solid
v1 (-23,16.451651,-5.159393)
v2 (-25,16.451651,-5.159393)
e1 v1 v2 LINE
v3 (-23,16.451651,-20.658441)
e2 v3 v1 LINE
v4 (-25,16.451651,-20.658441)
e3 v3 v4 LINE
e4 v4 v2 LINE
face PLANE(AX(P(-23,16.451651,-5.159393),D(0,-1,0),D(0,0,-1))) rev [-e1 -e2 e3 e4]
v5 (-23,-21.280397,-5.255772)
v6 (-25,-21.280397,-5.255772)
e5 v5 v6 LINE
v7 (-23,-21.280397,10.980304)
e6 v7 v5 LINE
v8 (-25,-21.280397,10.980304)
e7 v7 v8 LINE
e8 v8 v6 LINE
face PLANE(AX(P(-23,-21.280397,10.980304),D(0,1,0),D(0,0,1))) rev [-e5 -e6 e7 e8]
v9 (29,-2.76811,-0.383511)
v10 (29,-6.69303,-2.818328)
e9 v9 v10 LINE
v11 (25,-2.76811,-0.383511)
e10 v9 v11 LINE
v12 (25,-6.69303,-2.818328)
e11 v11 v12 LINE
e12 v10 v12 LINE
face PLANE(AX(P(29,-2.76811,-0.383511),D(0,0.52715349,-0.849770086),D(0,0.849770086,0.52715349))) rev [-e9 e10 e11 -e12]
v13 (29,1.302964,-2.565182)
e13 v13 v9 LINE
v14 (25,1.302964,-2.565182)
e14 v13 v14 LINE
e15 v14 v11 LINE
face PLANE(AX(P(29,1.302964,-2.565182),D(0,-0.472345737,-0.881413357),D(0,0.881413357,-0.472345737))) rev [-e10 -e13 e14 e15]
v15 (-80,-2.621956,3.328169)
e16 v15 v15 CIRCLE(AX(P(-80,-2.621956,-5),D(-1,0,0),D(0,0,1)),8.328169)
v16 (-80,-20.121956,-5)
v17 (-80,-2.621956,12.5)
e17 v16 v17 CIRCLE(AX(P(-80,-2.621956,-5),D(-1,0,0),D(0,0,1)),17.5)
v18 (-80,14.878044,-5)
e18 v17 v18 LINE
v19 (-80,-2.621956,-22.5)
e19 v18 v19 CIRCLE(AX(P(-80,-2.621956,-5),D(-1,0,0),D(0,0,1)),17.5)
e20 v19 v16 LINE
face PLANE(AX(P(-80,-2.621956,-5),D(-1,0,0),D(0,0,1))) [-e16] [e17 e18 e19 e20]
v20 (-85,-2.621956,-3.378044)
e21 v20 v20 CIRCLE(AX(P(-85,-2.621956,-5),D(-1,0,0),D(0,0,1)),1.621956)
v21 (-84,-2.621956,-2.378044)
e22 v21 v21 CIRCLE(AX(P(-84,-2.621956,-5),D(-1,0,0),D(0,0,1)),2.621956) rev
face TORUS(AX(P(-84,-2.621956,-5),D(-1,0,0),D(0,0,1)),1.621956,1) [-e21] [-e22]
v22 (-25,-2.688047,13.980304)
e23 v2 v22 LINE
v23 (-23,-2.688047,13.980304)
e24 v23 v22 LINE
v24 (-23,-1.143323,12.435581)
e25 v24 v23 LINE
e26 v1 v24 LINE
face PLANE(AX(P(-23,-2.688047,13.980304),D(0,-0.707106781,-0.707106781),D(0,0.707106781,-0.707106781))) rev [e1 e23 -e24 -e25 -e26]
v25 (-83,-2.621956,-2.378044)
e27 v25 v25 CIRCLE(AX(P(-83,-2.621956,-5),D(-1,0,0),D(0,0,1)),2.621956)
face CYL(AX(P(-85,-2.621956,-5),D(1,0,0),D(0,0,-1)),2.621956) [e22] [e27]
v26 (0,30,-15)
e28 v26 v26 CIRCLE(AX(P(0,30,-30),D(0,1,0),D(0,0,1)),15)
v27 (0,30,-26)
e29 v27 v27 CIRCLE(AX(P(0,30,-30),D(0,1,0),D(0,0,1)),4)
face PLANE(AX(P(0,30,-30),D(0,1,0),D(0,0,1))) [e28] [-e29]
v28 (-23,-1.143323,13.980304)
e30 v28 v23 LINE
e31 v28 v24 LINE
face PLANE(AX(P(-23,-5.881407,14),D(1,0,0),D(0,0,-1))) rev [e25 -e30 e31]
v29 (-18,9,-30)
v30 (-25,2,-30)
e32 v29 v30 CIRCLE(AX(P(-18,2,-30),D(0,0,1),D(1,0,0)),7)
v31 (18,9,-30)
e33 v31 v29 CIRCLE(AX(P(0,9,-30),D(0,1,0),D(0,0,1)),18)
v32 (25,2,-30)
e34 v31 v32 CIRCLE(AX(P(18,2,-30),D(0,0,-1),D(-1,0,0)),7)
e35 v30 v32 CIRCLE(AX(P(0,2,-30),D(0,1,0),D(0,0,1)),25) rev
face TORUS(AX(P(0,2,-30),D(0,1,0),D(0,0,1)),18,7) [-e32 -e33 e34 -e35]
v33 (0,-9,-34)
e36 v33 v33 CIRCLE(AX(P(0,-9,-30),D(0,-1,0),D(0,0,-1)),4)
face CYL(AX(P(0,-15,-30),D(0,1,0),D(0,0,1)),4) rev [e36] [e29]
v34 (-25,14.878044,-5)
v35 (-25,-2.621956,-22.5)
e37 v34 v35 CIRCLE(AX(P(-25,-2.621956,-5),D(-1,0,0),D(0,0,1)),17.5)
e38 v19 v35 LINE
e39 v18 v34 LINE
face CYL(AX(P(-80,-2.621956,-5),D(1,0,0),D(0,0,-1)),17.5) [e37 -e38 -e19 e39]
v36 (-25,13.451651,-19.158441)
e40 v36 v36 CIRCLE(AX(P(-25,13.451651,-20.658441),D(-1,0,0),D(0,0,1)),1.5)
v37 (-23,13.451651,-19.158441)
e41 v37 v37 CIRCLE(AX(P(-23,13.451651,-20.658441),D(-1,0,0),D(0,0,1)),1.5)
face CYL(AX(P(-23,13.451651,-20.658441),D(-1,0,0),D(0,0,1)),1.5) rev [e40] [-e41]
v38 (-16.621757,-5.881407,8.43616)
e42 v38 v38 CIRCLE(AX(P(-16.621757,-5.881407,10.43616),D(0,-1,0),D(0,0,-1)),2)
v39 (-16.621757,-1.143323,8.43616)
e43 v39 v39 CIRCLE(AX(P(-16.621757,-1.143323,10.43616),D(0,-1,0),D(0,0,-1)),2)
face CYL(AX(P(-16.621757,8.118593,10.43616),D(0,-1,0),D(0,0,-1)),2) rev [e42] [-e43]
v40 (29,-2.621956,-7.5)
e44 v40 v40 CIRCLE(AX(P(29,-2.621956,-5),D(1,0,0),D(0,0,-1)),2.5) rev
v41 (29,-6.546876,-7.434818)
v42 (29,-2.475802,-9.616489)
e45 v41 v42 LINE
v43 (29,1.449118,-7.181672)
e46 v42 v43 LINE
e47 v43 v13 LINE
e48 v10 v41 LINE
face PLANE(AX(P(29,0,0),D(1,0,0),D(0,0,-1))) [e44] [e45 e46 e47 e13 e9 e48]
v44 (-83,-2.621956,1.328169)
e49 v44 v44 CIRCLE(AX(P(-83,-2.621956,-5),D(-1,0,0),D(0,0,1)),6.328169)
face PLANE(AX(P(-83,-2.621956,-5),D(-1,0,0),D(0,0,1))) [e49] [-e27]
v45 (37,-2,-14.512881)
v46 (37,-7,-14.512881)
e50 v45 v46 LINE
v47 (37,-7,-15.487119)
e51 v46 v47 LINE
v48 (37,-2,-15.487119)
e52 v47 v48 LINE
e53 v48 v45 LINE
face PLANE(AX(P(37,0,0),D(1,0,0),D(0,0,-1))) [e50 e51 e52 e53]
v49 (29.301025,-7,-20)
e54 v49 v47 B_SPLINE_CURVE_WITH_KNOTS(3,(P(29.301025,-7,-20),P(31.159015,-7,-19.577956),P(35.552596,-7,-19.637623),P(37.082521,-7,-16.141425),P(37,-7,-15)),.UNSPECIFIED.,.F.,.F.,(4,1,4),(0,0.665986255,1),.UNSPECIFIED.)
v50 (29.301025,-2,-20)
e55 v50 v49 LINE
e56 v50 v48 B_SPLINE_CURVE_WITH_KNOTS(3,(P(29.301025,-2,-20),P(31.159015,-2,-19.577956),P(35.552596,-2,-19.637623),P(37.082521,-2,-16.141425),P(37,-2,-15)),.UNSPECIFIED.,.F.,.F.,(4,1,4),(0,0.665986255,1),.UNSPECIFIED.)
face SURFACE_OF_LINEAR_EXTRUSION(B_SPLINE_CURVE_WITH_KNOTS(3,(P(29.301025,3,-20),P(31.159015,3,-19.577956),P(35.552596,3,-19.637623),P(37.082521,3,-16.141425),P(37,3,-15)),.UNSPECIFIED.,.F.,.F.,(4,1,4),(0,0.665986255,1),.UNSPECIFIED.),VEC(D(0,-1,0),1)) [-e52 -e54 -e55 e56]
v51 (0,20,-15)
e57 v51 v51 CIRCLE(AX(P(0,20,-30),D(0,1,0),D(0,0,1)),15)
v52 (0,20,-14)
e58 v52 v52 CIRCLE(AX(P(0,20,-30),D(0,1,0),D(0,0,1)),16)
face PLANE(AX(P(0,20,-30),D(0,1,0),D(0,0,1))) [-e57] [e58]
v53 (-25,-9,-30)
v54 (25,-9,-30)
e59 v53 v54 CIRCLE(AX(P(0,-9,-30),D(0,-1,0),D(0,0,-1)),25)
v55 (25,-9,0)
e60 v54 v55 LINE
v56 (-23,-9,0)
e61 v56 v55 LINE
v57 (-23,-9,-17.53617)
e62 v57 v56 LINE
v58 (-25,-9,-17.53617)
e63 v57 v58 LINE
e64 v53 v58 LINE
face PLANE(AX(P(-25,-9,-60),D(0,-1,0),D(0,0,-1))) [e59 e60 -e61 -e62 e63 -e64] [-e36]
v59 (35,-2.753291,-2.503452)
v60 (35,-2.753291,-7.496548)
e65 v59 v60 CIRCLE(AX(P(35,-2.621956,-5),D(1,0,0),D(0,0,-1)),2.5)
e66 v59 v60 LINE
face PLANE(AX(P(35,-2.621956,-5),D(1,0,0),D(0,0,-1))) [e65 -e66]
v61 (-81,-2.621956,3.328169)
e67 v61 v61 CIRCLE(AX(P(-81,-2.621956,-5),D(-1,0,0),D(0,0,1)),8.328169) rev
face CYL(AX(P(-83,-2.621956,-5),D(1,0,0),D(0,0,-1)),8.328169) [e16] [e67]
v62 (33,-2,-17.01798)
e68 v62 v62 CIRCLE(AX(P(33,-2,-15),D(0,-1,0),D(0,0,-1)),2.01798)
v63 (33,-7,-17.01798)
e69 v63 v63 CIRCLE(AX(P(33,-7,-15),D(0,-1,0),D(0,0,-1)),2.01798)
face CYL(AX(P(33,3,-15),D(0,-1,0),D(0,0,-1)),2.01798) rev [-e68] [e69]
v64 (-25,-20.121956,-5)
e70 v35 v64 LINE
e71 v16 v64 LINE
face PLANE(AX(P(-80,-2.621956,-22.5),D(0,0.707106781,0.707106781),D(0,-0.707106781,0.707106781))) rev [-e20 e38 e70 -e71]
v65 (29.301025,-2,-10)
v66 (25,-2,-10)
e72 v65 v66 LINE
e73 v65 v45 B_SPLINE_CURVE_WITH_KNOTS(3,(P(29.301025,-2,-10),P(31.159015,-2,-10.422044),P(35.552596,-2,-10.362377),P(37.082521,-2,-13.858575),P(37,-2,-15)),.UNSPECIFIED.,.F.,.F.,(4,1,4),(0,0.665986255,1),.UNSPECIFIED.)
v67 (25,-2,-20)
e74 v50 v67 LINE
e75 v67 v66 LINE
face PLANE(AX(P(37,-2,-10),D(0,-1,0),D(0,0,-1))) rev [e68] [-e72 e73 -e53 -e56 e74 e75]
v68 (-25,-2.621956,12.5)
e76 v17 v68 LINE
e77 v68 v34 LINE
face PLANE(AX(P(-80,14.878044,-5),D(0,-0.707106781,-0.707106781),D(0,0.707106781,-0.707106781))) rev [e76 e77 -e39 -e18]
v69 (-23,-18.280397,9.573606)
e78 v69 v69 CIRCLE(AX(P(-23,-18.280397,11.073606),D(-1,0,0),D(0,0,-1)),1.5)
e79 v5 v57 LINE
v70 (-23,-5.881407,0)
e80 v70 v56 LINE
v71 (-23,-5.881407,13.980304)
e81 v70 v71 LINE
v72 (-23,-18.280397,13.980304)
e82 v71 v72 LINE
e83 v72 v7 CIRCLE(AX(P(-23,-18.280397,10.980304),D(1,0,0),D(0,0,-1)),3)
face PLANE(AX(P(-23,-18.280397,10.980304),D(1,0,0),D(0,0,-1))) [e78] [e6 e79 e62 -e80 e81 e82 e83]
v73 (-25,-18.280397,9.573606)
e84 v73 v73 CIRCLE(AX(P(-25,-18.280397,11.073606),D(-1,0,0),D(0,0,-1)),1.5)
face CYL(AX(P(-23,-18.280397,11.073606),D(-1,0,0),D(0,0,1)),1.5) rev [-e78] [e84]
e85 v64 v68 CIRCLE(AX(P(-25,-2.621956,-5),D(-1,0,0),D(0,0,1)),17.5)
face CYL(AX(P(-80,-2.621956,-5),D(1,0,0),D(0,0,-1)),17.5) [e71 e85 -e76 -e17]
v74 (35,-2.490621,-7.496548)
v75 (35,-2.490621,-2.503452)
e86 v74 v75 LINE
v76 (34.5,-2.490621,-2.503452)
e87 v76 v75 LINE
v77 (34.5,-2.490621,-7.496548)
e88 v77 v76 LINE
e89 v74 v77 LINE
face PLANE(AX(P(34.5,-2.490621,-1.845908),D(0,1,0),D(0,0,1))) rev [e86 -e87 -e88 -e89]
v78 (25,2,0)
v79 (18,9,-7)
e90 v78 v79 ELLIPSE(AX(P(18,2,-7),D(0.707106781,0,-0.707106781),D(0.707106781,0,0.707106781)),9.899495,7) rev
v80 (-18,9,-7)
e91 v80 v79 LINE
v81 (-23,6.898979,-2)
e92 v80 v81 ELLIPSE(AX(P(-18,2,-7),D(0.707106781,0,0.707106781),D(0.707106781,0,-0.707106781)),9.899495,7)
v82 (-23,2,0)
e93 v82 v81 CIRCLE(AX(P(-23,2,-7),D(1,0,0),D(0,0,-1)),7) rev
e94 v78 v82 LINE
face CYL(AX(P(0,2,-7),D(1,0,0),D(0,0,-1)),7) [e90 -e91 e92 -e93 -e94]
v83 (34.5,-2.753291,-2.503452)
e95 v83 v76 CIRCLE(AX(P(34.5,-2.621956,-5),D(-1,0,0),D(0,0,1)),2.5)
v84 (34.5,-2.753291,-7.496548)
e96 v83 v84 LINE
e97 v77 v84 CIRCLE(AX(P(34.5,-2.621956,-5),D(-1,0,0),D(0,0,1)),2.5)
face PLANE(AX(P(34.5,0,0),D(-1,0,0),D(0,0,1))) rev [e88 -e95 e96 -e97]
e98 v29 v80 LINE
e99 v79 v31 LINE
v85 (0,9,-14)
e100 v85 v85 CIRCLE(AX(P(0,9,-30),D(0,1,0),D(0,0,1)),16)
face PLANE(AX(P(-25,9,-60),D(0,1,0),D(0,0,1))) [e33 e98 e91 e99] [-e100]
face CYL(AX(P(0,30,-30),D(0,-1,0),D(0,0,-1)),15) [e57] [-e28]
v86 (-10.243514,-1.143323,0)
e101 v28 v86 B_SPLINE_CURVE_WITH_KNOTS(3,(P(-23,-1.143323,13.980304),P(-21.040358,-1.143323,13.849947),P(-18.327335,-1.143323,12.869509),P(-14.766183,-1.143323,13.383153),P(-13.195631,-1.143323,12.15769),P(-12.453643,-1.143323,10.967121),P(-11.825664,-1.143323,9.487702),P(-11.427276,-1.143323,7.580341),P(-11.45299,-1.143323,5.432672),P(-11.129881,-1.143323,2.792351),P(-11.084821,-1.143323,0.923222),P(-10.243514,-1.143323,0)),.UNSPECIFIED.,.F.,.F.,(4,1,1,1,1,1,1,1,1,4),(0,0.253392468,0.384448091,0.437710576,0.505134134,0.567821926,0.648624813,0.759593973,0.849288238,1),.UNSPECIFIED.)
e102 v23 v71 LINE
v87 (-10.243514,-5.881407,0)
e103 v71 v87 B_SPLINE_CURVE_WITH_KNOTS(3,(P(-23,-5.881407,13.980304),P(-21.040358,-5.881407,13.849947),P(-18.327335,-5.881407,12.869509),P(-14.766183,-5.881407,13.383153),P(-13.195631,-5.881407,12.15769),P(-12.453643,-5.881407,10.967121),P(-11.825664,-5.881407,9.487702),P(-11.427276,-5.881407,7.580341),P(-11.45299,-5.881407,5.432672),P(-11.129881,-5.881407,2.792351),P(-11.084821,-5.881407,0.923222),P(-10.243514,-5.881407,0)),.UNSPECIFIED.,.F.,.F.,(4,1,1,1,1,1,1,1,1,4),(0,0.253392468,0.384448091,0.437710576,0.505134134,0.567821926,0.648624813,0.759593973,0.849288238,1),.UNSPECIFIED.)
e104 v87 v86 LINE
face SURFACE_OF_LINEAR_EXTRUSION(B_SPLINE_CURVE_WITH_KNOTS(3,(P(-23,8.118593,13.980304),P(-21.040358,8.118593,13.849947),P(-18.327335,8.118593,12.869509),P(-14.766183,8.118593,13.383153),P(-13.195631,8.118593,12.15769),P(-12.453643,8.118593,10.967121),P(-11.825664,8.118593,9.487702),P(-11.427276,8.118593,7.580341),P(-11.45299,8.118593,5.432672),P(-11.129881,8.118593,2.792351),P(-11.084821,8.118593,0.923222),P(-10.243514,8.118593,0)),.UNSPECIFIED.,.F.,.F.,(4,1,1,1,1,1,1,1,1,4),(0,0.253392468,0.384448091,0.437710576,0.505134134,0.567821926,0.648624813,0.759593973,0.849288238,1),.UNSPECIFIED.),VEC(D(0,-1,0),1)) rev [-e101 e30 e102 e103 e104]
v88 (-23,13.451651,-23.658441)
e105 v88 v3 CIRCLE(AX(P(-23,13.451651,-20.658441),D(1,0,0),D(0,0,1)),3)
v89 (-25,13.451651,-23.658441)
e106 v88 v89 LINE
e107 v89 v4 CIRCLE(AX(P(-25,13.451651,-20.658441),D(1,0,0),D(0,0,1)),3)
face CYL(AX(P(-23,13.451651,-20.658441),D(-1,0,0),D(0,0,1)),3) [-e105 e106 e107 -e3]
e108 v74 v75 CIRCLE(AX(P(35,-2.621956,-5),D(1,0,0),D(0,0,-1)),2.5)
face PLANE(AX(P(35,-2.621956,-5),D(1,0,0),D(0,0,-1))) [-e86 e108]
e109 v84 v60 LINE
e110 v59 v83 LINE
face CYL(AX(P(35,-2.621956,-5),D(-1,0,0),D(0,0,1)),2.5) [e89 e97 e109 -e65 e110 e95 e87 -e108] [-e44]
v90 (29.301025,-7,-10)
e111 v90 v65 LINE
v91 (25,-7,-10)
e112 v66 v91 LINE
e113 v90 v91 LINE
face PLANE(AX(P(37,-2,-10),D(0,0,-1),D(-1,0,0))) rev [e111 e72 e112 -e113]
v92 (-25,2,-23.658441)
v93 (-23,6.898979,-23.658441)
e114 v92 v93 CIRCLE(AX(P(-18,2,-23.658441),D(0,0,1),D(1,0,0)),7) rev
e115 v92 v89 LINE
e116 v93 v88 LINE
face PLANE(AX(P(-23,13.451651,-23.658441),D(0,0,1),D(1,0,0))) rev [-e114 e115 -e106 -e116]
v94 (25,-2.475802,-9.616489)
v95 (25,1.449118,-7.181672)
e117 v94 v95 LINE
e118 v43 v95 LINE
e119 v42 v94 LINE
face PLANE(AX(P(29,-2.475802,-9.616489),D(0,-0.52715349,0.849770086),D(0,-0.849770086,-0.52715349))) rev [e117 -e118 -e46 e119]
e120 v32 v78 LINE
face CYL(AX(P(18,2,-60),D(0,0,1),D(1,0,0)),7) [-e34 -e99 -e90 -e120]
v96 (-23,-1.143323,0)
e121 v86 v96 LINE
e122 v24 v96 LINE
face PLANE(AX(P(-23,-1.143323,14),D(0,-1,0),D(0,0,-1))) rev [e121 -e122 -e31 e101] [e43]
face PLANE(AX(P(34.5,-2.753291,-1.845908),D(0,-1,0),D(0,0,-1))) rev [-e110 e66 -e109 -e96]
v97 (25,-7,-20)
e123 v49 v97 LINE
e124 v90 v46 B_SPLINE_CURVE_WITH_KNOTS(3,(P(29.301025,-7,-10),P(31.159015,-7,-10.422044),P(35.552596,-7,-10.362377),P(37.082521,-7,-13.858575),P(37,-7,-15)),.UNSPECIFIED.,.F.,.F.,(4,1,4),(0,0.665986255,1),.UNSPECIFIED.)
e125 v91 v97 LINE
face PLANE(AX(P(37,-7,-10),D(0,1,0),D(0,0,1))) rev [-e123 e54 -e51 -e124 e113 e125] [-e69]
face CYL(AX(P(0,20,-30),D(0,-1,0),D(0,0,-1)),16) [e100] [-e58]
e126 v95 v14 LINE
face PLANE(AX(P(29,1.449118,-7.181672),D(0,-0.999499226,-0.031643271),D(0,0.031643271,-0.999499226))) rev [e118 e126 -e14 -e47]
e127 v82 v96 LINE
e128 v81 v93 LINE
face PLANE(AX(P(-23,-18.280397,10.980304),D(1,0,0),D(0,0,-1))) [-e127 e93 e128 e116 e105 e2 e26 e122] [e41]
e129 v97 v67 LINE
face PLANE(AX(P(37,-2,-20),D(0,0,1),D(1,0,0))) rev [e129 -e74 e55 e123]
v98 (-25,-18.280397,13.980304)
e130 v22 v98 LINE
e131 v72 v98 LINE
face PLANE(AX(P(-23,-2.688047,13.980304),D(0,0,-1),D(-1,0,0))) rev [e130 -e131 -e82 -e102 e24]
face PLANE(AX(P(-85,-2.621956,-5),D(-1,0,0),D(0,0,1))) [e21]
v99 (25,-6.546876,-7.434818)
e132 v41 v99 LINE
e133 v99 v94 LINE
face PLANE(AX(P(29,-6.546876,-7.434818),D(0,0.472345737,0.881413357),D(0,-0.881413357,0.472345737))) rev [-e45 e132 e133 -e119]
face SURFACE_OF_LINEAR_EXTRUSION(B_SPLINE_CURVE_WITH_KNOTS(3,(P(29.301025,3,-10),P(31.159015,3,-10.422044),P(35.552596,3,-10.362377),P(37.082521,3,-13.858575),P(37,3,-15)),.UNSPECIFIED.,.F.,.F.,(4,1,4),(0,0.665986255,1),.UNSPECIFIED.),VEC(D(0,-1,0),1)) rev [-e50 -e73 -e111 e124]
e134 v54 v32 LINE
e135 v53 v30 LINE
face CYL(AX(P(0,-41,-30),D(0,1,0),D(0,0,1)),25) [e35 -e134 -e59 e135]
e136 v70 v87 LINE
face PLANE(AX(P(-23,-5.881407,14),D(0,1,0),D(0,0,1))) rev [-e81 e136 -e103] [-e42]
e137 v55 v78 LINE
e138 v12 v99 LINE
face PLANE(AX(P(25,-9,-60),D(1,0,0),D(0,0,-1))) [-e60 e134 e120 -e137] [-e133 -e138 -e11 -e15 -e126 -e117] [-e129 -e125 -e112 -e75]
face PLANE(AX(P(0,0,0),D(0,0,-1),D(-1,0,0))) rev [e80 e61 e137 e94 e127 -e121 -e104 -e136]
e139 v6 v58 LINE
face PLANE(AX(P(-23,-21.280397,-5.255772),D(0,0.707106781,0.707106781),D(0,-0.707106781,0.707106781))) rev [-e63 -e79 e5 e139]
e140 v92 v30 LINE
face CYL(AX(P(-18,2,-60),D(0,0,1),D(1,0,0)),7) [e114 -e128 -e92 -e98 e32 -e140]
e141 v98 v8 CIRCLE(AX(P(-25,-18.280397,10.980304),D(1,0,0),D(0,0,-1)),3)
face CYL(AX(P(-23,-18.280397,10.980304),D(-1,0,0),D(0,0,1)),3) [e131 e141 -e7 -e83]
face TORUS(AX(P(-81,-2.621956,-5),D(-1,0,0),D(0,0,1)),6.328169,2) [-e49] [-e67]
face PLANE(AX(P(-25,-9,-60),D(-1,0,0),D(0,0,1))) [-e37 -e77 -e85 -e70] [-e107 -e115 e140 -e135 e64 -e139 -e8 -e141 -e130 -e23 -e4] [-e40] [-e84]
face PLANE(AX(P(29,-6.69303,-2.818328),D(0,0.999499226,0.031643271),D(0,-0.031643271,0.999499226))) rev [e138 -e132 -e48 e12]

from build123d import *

# Parameters (mm, degrees)
SKETCH2_W                = 50
SKETCH2_H                = 18
BOSS_EXTRUDE1_DEPTH      = 60
CUT_EXTRUDE1_DEPTH       = 50
SKETCH4_R                = 16
BOSS_EXTRUDE2_DEPTH      = 11
SKETCH5_R                = 15
BOSS_EXTRUDE3_DEPTH      = 10
SKETCH6_R                = 4
CUT_EXTRUDE2_DEPTH       = 45
FILLET1_R                = 7
FILLET6_R                = 7
SKETCH7_W                = 10
SKETCH7_H                = 5
BOSS_EXTRUDE4_DEPTH      = 12
SKETCH8_R                = 2.017979808
CUT_EXTRUDE3_DEPTH       = 10
CUT_EXTRUDE4_DEPTH       = 10
BOSS_EXTRUDE5_DEPTH      = 4
BOSS_EXTRUDE6_DEPTH      = 6
BOSS_EXTRUDE6_DEPTH_BACK = 73
SKETCH12_R               = 2.5
SKETCH15_W               = 6.308184524
SKETCH15_H               = 0.262670096
CUT_EXTRUDE6_DEPTH       = 0.5
BOSS_EXTRUDE7_DEPTH      = 55
SKETCH22_R               = 8.328168783
BOSS_EXTRUDE8_DEPTH      = 3
SKETCH23_R               = 2.62195597
BOSS_EXTRUDE9_DEPTH      = 2
FILLET7_R                = 2
FILLET8_R                = 1
BOSS_EXTRUDE10_DEPTH     = 2
SKETCH25_R               = 1.5
CUT_EXTRUDE7_DEPTH       = 2
SKETCH27_W               = 12.756486499
SKETCH27_H               = 4.738083454
BOSS_EXTRUDE11_DEPTH     = 14
SKETCH28_R               = 2
CUT_EXTRUDE8_DEPTH       = 14


with BuildPart() as part:
    # Sketch2 → Boss-Extrude1 (new body)
    with BuildSketch(Plane.XY):
        Rectangle(SKETCH2_W, SKETCH2_H)
    extrude(amount=-BOSS_EXTRUDE1_DEPTH)

    # Sketch3 → Cut-Extrude1 (cut)
    with BuildSketch(Plane(origin=(0, 9, 0), x_dir=(1, 0, 0), z_dir=(0, 1, 0))):
        with BuildLine():
            Line((0, 55), (0, 60))
            Line((0, 60), (-25, 60))
            Line((-25, 60), (-25, 30))
            ThreePointArc((-25, 30), (-17.67766953, 47.67766953), (0, 55))
        make_face()
        with BuildLine():
            Line((25, 60), (0, 60))
            Line((0, 60), (0, 55))
            ThreePointArc((0, 55), (17.67766953, 47.67766953), (25, 30))
            Line((25, 30), (25, 60))
        make_face()
    extrude(amount=-CUT_EXTRUDE1_DEPTH, mode=Mode.SUBTRACT)

    # Sketch4 → Boss-Extrude2 (add)
    with BuildSketch(Plane(origin=(0, 9, 0), x_dir=(1, 0, 0), z_dir=(0, 1, 0))):
        with Locations(Location((0, 30, 0), (0, 0, 270))):
            Circle(SKETCH4_R)
    extrude(amount=BOSS_EXTRUDE2_DEPTH)

    # Sketch5 → Boss-Extrude3 (add)
    with BuildSketch(Plane(origin=(0, 20, 0), x_dir=(1, 0, 0), z_dir=(0, 1, 0))):
        with Locations(Location((0, 30, 0), (0, 0, 270))):
            Circle(SKETCH5_R)
    extrude(amount=BOSS_EXTRUDE3_DEPTH)

    # Sketch6 → Cut-Extrude2 (cut)
    with BuildSketch(Plane(origin=(0, 30, 0), x_dir=(1, 0, 0), z_dir=(0, 1, 0))):
        with Locations(Location((0, 30, 0), (0, 0, 270))):
            Circle(SKETCH6_R)
    extrude(amount=-CUT_EXTRUDE2_DEPTH, mode=Mode.SUBTRACT)

    # Fillet1
    fillet1_edges = [part.edges().sort_by_distance(p)[0] for p in [
        (0, 9, 0),
    ]]
    fillet(fillet1_edges, radius=FILLET1_R)

    # Fillet6
    # the kernel refuses this fillet: 7 mm, written as the material it takes off along each edge
    with BuildSketch(Plane(origin=(-25, 9, 10.5), x_dir=(0, -1, 0), z_dir=(0, 0, -1))) as fillet6_piece_1:
        with BuildLine():
            CenterArc((FILLET6_R, -FILLET6_R), FILLET6_R, 90, 90)
            Line((0, -FILLET6_R), (0, 0))
            Line((0, 0), (FILLET6_R, 0))
        make_face()
    extrude(amount=40.5, mode=Mode.SUBTRACT)
    with BuildSketch(Plane(origin=(0, 9, -30), x_dir=(-1, 0, 0), z_dir=(0, 0, 1))) as fillet6_piece_2:
        with BuildLine():
            CenterArc((25 - FILLET6_R, FILLET6_R), FILLET6_R, 270, 90)
            Line((25, FILLET6_R), (25, 0))
            Line((25, 0), (25 - FILLET6_R, 0))
        make_face()
    revolve(axis=Axis((0, 9, -30), (0, -1, 0)), revolution_arc=180, mode=Mode.SUBTRACT)
    with BuildSketch(Plane(origin=(25, 9, 10.5), x_dir=(0, -1, 0), z_dir=(0, 0, -1))) as fillet6_piece_3:
        with BuildLine():
            CenterArc((FILLET6_R, FILLET6_R), FILLET6_R, 180, 90)
            Line((0, FILLET6_R), (0, 0))
            Line((0, 0), (FILLET6_R, 0))
        make_face()
    extrude(amount=40.5, mode=Mode.SUBTRACT)

    # Sketch7 → Boss-Extrude4 (add)
    with BuildSketch(Plane(origin=(25, 0, 0), x_dir=(0, 0, -1), z_dir=(1, 0, 0))):
        with Locations((15, -4.5)):
            Rectangle(SKETCH7_W, SKETCH7_H)
    extrude(amount=BOSS_EXTRUDE4_DEPTH)

    # Sketch8 → Cut-Extrude3 (cut)
    with BuildSketch(Plane(origin=(0, -7, 0), x_dir=(-1, 0, 0), z_dir=(0, -1, 0))):
        with Locations(Location((-33, 15, 0), (0, 0, 90))):
            Circle(SKETCH8_R)
    extrude(amount=-CUT_EXTRUDE3_DEPTH, mode=Mode.SUBTRACT)

    # Sketch9 → Cut-Extrude4 (cut)
    with BuildSketch(Plane.XZ.offset(7)):
        with BuildLine():
            Line((37, -20), (37, -15.487118702))
            add(Edge.make_bspline(
                [(29.301025402, -20), (31.159014878, -19.577955894), (35.343998587, -19.634790074), (36.930791765, -16.465392679), (37, -15.487118702)],
                knots=[0, 0, 0, 0, 0.665986255, 0.952522337, 0.952522337, 0.952522337, 0.952522337], degree=3))
            Line((29.301025402, -20), (37, -20))
        make_face()
        with BuildLine():
            Line((37, -10), (29.301025402, -10))
            add(Edge.make_bspline(
                [(29.301025402, -10), (31.159014878, -10.422044106), (35.343998587, -10.365209926), (36.930791765, -13.534607321), (37, -14.512881298)],
                knots=[0, 0, 0, 0, 0.665986255, 0.952522337, 0.952522337, 0.952522337, 0.952522337], degree=3))
            Line((37, -14.512881298), (37, -10))
        make_face()
    extrude(amount=-CUT_EXTRUDE4_DEPTH, mode=Mode.SUBTRACT)

    # Sketch10 → Boss-Extrude5 (add)
    with BuildSketch(Plane(origin=(25, 0, 0), x_dir=(0, 0, -1), z_dir=(1, 0, 0))):
        Polygon((7.181671506, 1.449117939), (2.565182327, 1.302963931), (0.383510821, -2.768109978), (2.818328494, -6.693029879), (7.434817673, -6.546875871), (9.616489179, -2.475801962), align=None)
    extrude(amount=BOSS_EXTRUDE5_DEPTH)

    # Sketch12 → Boss-Extrude6 (add, two sides: drawn at the far end of the back side and taken through both)
    with BuildSketch(Plane(origin=(29, 0, 0), x_dir=(0, 0, -1), z_dir=(1, 0, 0)).offset(-BOSS_EXTRUDE6_DEPTH_BACK)):
        with Locations((5, -2.62195597)):
            Circle(SKETCH12_R)
    extrude(amount=BOSS_EXTRUDE6_DEPTH + BOSS_EXTRUDE6_DEPTH_BACK)

    # Sketch15 → Cut-Extrude6 (cut)
    with BuildSketch(Plane(origin=(35, 0, 0), x_dir=(0, 0, -1), z_dir=(1, 0, 0))):
        with Locations((5, -2.62195597)):
            Rectangle(SKETCH15_W, SKETCH15_H)
    extrude(amount=-CUT_EXTRUDE6_DEPTH, mode=Mode.SUBTRACT)

    # Sketch16 → Boss-Extrude7 (add)
    with BuildSketch(Plane.ZY.offset(25)):
        with BuildLine():
            Line((-5, 14.87804403), (12.5, -2.62195597))
            ThreePointArc((12.5, -2.62195597), (7.374368671, -14.996324641), (-5, -20.12195597))
            Line((-5, -20.12195597), (-22.5, -2.62195597))
            ThreePointArc((-22.5, -2.62195597), (-17.374368671, 9.752412701), (-5, 14.87804403))
        make_face()
    extrude(amount=BOSS_EXTRUDE7_DEPTH)

    # Sketch22 → Boss-Extrude8 (add)
    with BuildSketch(Plane.ZY.offset(80)):
        with Locations((-5, -2.62195597)):
            Circle(SKETCH22_R)
    extrude(amount=BOSS_EXTRUDE8_DEPTH)

    # Sketch23 → Boss-Extrude9 (add)
    with BuildSketch(Plane.ZY.offset(83)):
        with Locations((-5, -2.62195597)):
            Circle(SKETCH23_R)
    extrude(amount=BOSS_EXTRUDE9_DEPTH)

    # Fillet7
    fillet7_edges = [part.edges().sort_by_distance(p)[0] for p in [
        (-83, -2.62195597, -13.328168783),
    ]]
    fillet(fillet7_edges, radius=FILLET7_R)

    # Fillet8
    fillet8_edges = [part.edges().sort_by_distance(p)[0] for p in [
        (-85, -2.62195597, -7.62195597),
    ]]
    fillet(fillet8_edges, radius=FILLET8_R)

    # Sketch24 → Boss-Extrude10 (add)
    with BuildSketch(Plane(origin=(-25, 0, 0), x_dir=(0, 0, -1), z_dir=(1, 0, 0))):
        with BuildLine():
            Line((-13.980304455, -2.688046863), (5.159392937, 16.451650529))
            Line((5.159392937, 16.451650529), (20.658441278, 16.451650529))
            ThreePointArc((20.658441278, 16.451650529), (22.779761622, 15.572970872), (23.658441278, 13.451650529))
            Line((23.658441278, 13.451650529), (23.658441278, -2.877728254))
            Line((23.658441278, -2.877728254), (5.255772284, -21.280397249))
            Line((5.255772284, -21.280397249), (-10.980304455, -21.280397249))
            ThreePointArc((-10.980304455, -21.280397249), (-13.101624798, -20.401717592), (-13.980304455, -18.280397249))
            Line((-13.980304455, -18.280397249), (-13.980304455, -2.688046863))
        make_face()
    extrude(amount=BOSS_EXTRUDE10_DEPTH)

    # Sketch25 → Cut-Extrude7 (cut)
    with BuildSketch(Plane.ZY.offset(25)):
        with Locations((-20.658441278, 13.451650529)):
            Circle(SKETCH25_R)
        with Locations(Location((11.073606499, -18.280397249, 0), (0, 0, 180))):
            Circle(SKETCH25_R)
    extrude(amount=-CUT_EXTRUDE7_DEPTH, mode=Mode.SUBTRACT)

    # Sketch27 → Boss-Extrude11 (add)
    with BuildSketch(Plane.XY):
        with Locations((-16.621756751, -3.512365056)):
            Rectangle(SKETCH27_W, SKETCH27_H)
    extrude(amount=BOSS_EXTRUDE11_DEPTH)

    # Sketch28 → Cut-Extrude8 (cut)
    with BuildSketch(Plane(origin=(0, -5.881406783, 0), x_dir=(-1, 0, 0), z_dir=(0, -1, 0))):
        with BuildLine():
            add(Edge.make_bspline(
                [(23, -13.980304455), (21.040358256, -13.849946774), (18.327335378, -12.869508638), (14.76618265, -13.383152912), (13.195630898, -12.157690347), (12.453642875, -10.967120732), (11.825664424, -9.487701946), (11.427276145, -7.580341481), (11.452990141, -5.432672222), (11.129880797, -2.792351119), (11.084820543, -0.923222192), (10.243513501, 0)],
                knots=[0, 0, 0, 0, 0.253392468, 0.384448091, 0.437710576, 0.505134134, 0.567821926, 0.648624813, 0.759593973, 0.849288238, 1, 1, 1, 1], degree=3))
            Line((10.243513501, 0), (10.243513501, -14))
            Line((10.243513501, -14), (23, -14))
            Line((23, -14), (23, -13.980304455))
        make_face()
        with Locations(Location((16.62175675, -10.436159793, 0), (0, 0, 90))):
            Circle(SKETCH28_R)
    extrude(amount=-CUT_EXTRUDE8_DEPTH, mode=Mode.SUBTRACT)


solid = part.part
